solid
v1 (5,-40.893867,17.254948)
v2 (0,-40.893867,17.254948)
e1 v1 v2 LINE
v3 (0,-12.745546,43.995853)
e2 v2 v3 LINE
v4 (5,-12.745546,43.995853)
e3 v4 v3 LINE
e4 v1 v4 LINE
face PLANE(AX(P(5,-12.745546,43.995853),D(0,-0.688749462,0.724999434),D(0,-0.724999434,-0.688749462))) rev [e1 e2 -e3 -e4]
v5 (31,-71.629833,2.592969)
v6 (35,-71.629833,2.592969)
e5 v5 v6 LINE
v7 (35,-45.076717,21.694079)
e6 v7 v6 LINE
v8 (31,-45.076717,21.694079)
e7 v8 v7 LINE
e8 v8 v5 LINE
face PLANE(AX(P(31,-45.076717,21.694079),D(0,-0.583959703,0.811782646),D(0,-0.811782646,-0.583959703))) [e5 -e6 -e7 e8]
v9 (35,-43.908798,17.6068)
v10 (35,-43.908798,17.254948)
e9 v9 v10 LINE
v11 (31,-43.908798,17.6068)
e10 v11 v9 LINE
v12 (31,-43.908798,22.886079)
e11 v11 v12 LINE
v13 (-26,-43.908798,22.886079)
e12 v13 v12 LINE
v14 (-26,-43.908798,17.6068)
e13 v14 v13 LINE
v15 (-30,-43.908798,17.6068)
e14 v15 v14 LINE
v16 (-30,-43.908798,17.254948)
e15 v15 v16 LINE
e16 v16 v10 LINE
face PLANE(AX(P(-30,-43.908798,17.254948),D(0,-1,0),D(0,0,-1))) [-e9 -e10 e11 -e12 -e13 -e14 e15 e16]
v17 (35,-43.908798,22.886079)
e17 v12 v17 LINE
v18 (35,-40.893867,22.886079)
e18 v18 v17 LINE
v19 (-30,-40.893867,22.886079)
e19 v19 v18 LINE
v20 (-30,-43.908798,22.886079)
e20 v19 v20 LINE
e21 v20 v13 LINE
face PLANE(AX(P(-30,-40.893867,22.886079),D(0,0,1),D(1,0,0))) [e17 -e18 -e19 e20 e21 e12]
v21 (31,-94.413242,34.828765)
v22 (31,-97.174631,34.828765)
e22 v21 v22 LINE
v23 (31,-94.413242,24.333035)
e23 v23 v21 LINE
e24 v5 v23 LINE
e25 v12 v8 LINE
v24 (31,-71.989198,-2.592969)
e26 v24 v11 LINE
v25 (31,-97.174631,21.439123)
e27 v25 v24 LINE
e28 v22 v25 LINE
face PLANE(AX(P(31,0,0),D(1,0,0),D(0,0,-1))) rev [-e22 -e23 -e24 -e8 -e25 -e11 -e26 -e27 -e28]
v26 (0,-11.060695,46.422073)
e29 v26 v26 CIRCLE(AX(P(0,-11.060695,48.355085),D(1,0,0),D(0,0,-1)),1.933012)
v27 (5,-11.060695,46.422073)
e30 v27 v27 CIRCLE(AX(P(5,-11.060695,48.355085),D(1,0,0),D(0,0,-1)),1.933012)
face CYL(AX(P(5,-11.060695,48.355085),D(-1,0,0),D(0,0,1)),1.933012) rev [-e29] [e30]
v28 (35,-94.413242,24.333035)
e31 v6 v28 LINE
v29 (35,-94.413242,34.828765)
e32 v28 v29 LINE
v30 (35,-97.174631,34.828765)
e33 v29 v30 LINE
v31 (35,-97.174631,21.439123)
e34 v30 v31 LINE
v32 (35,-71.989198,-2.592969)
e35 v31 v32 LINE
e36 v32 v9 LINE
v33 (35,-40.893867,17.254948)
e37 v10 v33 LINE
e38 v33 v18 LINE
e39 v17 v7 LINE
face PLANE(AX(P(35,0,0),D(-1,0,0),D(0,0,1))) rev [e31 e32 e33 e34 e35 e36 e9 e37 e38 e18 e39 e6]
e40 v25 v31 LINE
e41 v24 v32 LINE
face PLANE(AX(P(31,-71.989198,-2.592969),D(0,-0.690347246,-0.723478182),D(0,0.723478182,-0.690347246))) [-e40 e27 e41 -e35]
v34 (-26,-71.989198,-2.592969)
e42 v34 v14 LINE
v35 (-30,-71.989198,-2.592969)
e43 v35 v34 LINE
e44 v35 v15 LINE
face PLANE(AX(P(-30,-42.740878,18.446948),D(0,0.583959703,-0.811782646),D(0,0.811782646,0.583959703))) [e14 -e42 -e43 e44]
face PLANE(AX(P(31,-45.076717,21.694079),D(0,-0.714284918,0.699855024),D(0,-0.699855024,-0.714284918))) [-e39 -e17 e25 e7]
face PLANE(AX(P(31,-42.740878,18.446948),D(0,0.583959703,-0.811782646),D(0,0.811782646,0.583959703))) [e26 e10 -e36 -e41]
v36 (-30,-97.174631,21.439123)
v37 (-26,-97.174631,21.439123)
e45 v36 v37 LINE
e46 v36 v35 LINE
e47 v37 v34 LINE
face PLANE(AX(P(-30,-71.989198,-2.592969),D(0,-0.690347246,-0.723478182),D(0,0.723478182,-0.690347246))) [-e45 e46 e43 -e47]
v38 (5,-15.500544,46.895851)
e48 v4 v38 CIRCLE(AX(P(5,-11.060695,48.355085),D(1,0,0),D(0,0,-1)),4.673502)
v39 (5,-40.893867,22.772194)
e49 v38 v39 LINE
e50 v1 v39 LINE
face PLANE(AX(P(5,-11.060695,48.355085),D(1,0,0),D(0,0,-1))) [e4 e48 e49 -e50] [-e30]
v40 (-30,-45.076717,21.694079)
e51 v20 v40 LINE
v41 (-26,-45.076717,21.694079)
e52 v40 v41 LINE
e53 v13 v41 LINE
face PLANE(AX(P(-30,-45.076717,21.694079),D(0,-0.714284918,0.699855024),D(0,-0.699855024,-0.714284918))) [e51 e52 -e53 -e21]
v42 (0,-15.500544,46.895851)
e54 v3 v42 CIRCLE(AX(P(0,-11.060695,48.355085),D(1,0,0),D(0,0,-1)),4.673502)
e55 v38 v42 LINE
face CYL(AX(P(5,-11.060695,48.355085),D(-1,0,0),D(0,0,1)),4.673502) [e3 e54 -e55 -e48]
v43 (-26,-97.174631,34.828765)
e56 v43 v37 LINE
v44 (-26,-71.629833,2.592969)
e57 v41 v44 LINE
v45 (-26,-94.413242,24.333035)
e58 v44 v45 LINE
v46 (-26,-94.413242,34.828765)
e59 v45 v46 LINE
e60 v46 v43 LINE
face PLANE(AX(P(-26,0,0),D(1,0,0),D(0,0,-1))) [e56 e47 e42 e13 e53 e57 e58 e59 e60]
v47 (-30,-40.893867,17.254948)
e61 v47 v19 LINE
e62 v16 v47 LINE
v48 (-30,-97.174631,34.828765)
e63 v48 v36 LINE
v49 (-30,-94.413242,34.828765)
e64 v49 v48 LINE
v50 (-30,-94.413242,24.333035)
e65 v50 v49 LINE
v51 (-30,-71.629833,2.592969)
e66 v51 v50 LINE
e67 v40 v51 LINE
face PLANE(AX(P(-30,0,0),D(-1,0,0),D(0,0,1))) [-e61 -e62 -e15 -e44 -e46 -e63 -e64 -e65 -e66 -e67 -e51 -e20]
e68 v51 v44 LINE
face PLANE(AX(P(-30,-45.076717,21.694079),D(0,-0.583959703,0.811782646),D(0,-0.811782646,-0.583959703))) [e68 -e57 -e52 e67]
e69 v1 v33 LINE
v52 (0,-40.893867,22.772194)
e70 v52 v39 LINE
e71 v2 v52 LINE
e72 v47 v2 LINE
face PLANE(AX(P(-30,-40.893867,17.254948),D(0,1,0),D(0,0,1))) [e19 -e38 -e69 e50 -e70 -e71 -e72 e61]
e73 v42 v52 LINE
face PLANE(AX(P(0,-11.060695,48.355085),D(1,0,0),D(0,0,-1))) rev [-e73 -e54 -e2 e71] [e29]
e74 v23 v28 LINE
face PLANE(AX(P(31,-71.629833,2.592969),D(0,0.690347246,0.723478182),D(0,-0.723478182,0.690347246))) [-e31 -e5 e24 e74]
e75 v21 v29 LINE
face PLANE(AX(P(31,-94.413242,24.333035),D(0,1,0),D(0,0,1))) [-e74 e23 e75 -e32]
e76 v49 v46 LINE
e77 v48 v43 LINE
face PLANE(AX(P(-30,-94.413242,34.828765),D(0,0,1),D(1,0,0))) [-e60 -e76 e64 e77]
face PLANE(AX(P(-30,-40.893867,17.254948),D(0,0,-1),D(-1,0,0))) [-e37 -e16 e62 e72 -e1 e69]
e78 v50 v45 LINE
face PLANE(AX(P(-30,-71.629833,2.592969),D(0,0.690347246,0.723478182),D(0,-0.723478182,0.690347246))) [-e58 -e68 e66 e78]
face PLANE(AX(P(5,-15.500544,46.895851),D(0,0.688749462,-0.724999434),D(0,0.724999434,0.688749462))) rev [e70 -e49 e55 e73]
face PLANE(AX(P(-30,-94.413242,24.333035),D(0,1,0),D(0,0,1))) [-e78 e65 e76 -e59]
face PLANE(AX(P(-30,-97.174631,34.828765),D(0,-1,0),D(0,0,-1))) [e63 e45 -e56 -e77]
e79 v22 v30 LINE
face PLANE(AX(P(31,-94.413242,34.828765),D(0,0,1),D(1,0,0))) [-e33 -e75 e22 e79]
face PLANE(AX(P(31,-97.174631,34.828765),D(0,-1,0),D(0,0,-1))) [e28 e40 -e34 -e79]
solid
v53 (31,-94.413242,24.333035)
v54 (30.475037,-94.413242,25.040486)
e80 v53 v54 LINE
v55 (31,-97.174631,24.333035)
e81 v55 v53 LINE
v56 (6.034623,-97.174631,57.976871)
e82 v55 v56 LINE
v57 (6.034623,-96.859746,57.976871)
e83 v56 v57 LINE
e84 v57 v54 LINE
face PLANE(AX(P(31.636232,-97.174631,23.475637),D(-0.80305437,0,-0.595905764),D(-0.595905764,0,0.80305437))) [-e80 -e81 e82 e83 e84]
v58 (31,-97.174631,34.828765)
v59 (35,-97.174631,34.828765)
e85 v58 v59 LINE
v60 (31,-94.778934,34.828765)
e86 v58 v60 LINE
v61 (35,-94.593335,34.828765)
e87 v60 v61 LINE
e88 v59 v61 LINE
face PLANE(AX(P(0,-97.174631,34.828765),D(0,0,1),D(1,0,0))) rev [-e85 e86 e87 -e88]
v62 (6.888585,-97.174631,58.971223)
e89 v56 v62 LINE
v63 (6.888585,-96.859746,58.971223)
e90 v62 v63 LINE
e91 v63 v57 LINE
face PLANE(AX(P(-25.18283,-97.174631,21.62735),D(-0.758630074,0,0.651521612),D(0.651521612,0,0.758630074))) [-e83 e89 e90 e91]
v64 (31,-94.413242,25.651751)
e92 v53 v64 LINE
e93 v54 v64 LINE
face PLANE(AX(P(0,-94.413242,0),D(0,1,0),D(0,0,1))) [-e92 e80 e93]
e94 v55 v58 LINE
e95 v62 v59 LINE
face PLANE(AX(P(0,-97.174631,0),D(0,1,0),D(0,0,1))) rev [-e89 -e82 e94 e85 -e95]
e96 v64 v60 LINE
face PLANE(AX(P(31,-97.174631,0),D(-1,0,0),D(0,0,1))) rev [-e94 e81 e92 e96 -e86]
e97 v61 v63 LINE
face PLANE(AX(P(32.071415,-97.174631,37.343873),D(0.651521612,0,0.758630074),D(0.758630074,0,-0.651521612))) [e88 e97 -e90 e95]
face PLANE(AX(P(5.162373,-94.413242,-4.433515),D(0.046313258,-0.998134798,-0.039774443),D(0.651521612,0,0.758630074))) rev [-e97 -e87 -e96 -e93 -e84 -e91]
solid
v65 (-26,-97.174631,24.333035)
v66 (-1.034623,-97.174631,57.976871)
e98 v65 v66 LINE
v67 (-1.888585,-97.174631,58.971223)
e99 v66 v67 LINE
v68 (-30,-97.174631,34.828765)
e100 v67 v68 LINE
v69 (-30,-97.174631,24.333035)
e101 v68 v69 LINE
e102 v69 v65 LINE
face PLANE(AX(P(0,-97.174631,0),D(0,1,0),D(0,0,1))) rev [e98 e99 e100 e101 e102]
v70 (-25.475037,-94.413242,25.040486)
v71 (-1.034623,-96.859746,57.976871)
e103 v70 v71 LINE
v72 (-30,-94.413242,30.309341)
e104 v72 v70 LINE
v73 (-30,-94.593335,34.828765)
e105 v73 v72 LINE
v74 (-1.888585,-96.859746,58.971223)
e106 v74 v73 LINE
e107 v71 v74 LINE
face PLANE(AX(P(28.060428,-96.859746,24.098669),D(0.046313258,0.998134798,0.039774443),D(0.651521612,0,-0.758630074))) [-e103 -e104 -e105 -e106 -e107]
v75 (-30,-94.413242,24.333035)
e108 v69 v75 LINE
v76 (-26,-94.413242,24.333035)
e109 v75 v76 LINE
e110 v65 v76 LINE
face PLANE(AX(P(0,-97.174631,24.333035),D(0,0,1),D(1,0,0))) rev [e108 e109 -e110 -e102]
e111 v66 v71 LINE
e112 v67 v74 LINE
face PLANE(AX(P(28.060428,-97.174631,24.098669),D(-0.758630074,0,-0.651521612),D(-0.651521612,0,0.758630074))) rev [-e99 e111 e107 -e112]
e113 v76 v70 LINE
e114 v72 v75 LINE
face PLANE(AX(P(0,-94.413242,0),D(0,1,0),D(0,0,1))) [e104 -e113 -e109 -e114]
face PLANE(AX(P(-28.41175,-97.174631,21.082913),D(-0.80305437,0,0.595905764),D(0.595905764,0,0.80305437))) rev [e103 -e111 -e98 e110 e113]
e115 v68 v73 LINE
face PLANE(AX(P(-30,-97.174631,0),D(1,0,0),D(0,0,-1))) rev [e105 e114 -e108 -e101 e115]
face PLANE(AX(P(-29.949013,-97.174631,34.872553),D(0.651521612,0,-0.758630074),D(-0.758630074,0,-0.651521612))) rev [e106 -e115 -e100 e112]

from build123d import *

# Parameters (mm, degrees)
SKETCH1_R                = 1.933011648
BOSS_EXTRUDE2_DEPTH      = 5
BOSS_EXTRUDE3_DEPTH      = 30
BOSS_EXTRUDE3_DEPTH_BACK = 35
SKETCH2_W                = 5.631130668
SKETCH2_H                = 3.014930961
BOSS_EXTRUDE4_DEPTH      = 4
LPATTERN1_COUNT          = 2
LPATTERN1_PITCH          = 61
BOSS_EXTRUDE7_START      = -2.761388983
BOSS_EXTRUDE7_DEPTH      = 2.761388983
CHAMFER4_SIZE            = 2.446504806
CHAMFER4_SIZE_2          = 40
CHAMFER5_SIZE            = 2.446504806
CHAMFER5_SIZE_2          = 40


# Read off the part's stored shape, not the designer's step: Boss-Extrude7
with BuildPart() as part:
    # Sketch1 → Boss-Extrude2 (new body)
    with BuildSketch(Plane(origin=(0, 0, 0), x_dir=(0, 0, -1), z_dir=(1, 0, 0))):
        with BuildLine():
            Line((-46.895851091, -15.500543616), (-20.154946043, -43.648864718))
            Line((-20.154946043, -43.648864718), (-17.254948309, -40.893866871))
            Line((-17.254948309, -40.893866871), (-43.995853357, -12.745545768))
            ThreePointArc((-43.995853357, -12.745545768), (-51.573956687, -7.672408414), (-46.895851091, -15.500543616))
        make_face()
        with Locations((-48.355084699, -11.060694718)):
            Circle(SKETCH1_R, mode=Mode.SUBTRACT)
    extrude(amount=BOSS_EXTRUDE2_DEPTH)

    # Sketch2 → Boss-Extrude3 (add, two sides: drawn at the far end of the back side and taken through both)
    with BuildSketch(Plane(origin=(5, 0, 0), x_dir=(0, 0, -1), z_dir=(1, 0, 0)).offset(-BOSS_EXTRUDE3_DEPTH_BACK)):
        with Locations((-20.070513643, -42.401332352)):
            Rectangle(SKETCH2_W, SKETCH2_H)
    extrude(amount=BOSS_EXTRUDE3_DEPTH + BOSS_EXTRUDE3_DEPTH_BACK)

    # Sketch3 → Boss-Extrude4 (add)
    with BuildSketch(Plane(origin=(35, 0, 0), x_dir=(0, 0, -1), z_dir=(1, 0, 0))):
        Polygon((-21.694078936, -45.076717239), (-2.592969181, -71.629832685), (-24.333035342, -94.41324153), (-34.828765043, -94.41324153), (-34.828765043, -97.174630514), (-21.439122613, -97.174630514), (2.592969181, -71.989197834), (-18.446948351, -42.740878425), (-22.886078977, -43.908797832), align=None)
    boss_extrude4 = extrude(amount=-BOSS_EXTRUDE4_DEPTH)

    # LPattern1: Boss-Extrude4 ×2
    with Locations(*[(-i * LPATTERN1_PITCH, 0, 0) for i in range(1, LPATTERN1_COUNT)]):
        add(boss_extrude4)


with BuildPart() as body_2:
    # Boss-Extrude7 outline → Boss-Extrude7 (new body)
    with BuildSketch(Plane(origin=(0, -94.41324153, 0), x_dir=(1, 0, 0), z_dir=(0, 1, 0)).offset(BOSS_EXTRUDE7_START)):
        Polygon((31, -34.828765043), (31, -24.333035342), (6.034622548, -57.97687078), (6.8885851, -58.971222561), (35, -34.828765043), align=None)
        Polygon((-26, -24.333035342), (-30, -24.333035342), (-30, -34.828765043), (-1.8885851, -58.971222561), (-1.034622548, -57.97687078), align=None)
    extrude(amount=BOSS_EXTRUDE7_DEPTH)

    # Chamfer4
    # the kernel refuses this chamfer: 40, 2.446504806 mm, written as the material it takes off along each edge
    with BuildSketch(Plane(origin=(-69.64215859, -94.41324153, 137.86330783), x_dir=(0.40332576937215514, -0.8469640789593069, 0.346381542107792), z_dir=(0.6515216112589131, 0, -0.7586300745835153))) as chamfer4_piece_1:
        Polygon((CHAMFER4_SIZE * 0.846964078966, CHAMFER4_SIZE * 0.531650118929), (-CHAMFER4_SIZE_2 * 0.531650118925, CHAMFER4_SIZE_2 * 0.846964078959), (0, 0), align=None)
    extrude(amount=209.296372024, mode=Mode.SUBTRACT)

    # Chamfer5
    # the kernel refuses this chamfer: 40, 2.446504806 mm, written as the material it takes off along each edge
    with BuildSketch(Plane(origin=(-61.718950942, -94.41324153, -20.915214489), x_dir=(-0.4033257693721534, -0.8469640789593084, 0.34638154210779065), z_dir=(0.6515216112589132, 0, 0.7586300745835151))) as chamfer5_piece_1:
        Polygon((CHAMFER5_SIZE * 0.846964078966, CHAMFER5_SIZE * 0.531650118929), (-CHAMFER5_SIZE_2 * 0.531650118925, CHAMFER5_SIZE_2 * 0.846964078959), (0, 0), align=None)
    extrude(amount=209.296372024, mode=Mode.SUBTRACT)


solid = Compound([part.part, body_2.part])
